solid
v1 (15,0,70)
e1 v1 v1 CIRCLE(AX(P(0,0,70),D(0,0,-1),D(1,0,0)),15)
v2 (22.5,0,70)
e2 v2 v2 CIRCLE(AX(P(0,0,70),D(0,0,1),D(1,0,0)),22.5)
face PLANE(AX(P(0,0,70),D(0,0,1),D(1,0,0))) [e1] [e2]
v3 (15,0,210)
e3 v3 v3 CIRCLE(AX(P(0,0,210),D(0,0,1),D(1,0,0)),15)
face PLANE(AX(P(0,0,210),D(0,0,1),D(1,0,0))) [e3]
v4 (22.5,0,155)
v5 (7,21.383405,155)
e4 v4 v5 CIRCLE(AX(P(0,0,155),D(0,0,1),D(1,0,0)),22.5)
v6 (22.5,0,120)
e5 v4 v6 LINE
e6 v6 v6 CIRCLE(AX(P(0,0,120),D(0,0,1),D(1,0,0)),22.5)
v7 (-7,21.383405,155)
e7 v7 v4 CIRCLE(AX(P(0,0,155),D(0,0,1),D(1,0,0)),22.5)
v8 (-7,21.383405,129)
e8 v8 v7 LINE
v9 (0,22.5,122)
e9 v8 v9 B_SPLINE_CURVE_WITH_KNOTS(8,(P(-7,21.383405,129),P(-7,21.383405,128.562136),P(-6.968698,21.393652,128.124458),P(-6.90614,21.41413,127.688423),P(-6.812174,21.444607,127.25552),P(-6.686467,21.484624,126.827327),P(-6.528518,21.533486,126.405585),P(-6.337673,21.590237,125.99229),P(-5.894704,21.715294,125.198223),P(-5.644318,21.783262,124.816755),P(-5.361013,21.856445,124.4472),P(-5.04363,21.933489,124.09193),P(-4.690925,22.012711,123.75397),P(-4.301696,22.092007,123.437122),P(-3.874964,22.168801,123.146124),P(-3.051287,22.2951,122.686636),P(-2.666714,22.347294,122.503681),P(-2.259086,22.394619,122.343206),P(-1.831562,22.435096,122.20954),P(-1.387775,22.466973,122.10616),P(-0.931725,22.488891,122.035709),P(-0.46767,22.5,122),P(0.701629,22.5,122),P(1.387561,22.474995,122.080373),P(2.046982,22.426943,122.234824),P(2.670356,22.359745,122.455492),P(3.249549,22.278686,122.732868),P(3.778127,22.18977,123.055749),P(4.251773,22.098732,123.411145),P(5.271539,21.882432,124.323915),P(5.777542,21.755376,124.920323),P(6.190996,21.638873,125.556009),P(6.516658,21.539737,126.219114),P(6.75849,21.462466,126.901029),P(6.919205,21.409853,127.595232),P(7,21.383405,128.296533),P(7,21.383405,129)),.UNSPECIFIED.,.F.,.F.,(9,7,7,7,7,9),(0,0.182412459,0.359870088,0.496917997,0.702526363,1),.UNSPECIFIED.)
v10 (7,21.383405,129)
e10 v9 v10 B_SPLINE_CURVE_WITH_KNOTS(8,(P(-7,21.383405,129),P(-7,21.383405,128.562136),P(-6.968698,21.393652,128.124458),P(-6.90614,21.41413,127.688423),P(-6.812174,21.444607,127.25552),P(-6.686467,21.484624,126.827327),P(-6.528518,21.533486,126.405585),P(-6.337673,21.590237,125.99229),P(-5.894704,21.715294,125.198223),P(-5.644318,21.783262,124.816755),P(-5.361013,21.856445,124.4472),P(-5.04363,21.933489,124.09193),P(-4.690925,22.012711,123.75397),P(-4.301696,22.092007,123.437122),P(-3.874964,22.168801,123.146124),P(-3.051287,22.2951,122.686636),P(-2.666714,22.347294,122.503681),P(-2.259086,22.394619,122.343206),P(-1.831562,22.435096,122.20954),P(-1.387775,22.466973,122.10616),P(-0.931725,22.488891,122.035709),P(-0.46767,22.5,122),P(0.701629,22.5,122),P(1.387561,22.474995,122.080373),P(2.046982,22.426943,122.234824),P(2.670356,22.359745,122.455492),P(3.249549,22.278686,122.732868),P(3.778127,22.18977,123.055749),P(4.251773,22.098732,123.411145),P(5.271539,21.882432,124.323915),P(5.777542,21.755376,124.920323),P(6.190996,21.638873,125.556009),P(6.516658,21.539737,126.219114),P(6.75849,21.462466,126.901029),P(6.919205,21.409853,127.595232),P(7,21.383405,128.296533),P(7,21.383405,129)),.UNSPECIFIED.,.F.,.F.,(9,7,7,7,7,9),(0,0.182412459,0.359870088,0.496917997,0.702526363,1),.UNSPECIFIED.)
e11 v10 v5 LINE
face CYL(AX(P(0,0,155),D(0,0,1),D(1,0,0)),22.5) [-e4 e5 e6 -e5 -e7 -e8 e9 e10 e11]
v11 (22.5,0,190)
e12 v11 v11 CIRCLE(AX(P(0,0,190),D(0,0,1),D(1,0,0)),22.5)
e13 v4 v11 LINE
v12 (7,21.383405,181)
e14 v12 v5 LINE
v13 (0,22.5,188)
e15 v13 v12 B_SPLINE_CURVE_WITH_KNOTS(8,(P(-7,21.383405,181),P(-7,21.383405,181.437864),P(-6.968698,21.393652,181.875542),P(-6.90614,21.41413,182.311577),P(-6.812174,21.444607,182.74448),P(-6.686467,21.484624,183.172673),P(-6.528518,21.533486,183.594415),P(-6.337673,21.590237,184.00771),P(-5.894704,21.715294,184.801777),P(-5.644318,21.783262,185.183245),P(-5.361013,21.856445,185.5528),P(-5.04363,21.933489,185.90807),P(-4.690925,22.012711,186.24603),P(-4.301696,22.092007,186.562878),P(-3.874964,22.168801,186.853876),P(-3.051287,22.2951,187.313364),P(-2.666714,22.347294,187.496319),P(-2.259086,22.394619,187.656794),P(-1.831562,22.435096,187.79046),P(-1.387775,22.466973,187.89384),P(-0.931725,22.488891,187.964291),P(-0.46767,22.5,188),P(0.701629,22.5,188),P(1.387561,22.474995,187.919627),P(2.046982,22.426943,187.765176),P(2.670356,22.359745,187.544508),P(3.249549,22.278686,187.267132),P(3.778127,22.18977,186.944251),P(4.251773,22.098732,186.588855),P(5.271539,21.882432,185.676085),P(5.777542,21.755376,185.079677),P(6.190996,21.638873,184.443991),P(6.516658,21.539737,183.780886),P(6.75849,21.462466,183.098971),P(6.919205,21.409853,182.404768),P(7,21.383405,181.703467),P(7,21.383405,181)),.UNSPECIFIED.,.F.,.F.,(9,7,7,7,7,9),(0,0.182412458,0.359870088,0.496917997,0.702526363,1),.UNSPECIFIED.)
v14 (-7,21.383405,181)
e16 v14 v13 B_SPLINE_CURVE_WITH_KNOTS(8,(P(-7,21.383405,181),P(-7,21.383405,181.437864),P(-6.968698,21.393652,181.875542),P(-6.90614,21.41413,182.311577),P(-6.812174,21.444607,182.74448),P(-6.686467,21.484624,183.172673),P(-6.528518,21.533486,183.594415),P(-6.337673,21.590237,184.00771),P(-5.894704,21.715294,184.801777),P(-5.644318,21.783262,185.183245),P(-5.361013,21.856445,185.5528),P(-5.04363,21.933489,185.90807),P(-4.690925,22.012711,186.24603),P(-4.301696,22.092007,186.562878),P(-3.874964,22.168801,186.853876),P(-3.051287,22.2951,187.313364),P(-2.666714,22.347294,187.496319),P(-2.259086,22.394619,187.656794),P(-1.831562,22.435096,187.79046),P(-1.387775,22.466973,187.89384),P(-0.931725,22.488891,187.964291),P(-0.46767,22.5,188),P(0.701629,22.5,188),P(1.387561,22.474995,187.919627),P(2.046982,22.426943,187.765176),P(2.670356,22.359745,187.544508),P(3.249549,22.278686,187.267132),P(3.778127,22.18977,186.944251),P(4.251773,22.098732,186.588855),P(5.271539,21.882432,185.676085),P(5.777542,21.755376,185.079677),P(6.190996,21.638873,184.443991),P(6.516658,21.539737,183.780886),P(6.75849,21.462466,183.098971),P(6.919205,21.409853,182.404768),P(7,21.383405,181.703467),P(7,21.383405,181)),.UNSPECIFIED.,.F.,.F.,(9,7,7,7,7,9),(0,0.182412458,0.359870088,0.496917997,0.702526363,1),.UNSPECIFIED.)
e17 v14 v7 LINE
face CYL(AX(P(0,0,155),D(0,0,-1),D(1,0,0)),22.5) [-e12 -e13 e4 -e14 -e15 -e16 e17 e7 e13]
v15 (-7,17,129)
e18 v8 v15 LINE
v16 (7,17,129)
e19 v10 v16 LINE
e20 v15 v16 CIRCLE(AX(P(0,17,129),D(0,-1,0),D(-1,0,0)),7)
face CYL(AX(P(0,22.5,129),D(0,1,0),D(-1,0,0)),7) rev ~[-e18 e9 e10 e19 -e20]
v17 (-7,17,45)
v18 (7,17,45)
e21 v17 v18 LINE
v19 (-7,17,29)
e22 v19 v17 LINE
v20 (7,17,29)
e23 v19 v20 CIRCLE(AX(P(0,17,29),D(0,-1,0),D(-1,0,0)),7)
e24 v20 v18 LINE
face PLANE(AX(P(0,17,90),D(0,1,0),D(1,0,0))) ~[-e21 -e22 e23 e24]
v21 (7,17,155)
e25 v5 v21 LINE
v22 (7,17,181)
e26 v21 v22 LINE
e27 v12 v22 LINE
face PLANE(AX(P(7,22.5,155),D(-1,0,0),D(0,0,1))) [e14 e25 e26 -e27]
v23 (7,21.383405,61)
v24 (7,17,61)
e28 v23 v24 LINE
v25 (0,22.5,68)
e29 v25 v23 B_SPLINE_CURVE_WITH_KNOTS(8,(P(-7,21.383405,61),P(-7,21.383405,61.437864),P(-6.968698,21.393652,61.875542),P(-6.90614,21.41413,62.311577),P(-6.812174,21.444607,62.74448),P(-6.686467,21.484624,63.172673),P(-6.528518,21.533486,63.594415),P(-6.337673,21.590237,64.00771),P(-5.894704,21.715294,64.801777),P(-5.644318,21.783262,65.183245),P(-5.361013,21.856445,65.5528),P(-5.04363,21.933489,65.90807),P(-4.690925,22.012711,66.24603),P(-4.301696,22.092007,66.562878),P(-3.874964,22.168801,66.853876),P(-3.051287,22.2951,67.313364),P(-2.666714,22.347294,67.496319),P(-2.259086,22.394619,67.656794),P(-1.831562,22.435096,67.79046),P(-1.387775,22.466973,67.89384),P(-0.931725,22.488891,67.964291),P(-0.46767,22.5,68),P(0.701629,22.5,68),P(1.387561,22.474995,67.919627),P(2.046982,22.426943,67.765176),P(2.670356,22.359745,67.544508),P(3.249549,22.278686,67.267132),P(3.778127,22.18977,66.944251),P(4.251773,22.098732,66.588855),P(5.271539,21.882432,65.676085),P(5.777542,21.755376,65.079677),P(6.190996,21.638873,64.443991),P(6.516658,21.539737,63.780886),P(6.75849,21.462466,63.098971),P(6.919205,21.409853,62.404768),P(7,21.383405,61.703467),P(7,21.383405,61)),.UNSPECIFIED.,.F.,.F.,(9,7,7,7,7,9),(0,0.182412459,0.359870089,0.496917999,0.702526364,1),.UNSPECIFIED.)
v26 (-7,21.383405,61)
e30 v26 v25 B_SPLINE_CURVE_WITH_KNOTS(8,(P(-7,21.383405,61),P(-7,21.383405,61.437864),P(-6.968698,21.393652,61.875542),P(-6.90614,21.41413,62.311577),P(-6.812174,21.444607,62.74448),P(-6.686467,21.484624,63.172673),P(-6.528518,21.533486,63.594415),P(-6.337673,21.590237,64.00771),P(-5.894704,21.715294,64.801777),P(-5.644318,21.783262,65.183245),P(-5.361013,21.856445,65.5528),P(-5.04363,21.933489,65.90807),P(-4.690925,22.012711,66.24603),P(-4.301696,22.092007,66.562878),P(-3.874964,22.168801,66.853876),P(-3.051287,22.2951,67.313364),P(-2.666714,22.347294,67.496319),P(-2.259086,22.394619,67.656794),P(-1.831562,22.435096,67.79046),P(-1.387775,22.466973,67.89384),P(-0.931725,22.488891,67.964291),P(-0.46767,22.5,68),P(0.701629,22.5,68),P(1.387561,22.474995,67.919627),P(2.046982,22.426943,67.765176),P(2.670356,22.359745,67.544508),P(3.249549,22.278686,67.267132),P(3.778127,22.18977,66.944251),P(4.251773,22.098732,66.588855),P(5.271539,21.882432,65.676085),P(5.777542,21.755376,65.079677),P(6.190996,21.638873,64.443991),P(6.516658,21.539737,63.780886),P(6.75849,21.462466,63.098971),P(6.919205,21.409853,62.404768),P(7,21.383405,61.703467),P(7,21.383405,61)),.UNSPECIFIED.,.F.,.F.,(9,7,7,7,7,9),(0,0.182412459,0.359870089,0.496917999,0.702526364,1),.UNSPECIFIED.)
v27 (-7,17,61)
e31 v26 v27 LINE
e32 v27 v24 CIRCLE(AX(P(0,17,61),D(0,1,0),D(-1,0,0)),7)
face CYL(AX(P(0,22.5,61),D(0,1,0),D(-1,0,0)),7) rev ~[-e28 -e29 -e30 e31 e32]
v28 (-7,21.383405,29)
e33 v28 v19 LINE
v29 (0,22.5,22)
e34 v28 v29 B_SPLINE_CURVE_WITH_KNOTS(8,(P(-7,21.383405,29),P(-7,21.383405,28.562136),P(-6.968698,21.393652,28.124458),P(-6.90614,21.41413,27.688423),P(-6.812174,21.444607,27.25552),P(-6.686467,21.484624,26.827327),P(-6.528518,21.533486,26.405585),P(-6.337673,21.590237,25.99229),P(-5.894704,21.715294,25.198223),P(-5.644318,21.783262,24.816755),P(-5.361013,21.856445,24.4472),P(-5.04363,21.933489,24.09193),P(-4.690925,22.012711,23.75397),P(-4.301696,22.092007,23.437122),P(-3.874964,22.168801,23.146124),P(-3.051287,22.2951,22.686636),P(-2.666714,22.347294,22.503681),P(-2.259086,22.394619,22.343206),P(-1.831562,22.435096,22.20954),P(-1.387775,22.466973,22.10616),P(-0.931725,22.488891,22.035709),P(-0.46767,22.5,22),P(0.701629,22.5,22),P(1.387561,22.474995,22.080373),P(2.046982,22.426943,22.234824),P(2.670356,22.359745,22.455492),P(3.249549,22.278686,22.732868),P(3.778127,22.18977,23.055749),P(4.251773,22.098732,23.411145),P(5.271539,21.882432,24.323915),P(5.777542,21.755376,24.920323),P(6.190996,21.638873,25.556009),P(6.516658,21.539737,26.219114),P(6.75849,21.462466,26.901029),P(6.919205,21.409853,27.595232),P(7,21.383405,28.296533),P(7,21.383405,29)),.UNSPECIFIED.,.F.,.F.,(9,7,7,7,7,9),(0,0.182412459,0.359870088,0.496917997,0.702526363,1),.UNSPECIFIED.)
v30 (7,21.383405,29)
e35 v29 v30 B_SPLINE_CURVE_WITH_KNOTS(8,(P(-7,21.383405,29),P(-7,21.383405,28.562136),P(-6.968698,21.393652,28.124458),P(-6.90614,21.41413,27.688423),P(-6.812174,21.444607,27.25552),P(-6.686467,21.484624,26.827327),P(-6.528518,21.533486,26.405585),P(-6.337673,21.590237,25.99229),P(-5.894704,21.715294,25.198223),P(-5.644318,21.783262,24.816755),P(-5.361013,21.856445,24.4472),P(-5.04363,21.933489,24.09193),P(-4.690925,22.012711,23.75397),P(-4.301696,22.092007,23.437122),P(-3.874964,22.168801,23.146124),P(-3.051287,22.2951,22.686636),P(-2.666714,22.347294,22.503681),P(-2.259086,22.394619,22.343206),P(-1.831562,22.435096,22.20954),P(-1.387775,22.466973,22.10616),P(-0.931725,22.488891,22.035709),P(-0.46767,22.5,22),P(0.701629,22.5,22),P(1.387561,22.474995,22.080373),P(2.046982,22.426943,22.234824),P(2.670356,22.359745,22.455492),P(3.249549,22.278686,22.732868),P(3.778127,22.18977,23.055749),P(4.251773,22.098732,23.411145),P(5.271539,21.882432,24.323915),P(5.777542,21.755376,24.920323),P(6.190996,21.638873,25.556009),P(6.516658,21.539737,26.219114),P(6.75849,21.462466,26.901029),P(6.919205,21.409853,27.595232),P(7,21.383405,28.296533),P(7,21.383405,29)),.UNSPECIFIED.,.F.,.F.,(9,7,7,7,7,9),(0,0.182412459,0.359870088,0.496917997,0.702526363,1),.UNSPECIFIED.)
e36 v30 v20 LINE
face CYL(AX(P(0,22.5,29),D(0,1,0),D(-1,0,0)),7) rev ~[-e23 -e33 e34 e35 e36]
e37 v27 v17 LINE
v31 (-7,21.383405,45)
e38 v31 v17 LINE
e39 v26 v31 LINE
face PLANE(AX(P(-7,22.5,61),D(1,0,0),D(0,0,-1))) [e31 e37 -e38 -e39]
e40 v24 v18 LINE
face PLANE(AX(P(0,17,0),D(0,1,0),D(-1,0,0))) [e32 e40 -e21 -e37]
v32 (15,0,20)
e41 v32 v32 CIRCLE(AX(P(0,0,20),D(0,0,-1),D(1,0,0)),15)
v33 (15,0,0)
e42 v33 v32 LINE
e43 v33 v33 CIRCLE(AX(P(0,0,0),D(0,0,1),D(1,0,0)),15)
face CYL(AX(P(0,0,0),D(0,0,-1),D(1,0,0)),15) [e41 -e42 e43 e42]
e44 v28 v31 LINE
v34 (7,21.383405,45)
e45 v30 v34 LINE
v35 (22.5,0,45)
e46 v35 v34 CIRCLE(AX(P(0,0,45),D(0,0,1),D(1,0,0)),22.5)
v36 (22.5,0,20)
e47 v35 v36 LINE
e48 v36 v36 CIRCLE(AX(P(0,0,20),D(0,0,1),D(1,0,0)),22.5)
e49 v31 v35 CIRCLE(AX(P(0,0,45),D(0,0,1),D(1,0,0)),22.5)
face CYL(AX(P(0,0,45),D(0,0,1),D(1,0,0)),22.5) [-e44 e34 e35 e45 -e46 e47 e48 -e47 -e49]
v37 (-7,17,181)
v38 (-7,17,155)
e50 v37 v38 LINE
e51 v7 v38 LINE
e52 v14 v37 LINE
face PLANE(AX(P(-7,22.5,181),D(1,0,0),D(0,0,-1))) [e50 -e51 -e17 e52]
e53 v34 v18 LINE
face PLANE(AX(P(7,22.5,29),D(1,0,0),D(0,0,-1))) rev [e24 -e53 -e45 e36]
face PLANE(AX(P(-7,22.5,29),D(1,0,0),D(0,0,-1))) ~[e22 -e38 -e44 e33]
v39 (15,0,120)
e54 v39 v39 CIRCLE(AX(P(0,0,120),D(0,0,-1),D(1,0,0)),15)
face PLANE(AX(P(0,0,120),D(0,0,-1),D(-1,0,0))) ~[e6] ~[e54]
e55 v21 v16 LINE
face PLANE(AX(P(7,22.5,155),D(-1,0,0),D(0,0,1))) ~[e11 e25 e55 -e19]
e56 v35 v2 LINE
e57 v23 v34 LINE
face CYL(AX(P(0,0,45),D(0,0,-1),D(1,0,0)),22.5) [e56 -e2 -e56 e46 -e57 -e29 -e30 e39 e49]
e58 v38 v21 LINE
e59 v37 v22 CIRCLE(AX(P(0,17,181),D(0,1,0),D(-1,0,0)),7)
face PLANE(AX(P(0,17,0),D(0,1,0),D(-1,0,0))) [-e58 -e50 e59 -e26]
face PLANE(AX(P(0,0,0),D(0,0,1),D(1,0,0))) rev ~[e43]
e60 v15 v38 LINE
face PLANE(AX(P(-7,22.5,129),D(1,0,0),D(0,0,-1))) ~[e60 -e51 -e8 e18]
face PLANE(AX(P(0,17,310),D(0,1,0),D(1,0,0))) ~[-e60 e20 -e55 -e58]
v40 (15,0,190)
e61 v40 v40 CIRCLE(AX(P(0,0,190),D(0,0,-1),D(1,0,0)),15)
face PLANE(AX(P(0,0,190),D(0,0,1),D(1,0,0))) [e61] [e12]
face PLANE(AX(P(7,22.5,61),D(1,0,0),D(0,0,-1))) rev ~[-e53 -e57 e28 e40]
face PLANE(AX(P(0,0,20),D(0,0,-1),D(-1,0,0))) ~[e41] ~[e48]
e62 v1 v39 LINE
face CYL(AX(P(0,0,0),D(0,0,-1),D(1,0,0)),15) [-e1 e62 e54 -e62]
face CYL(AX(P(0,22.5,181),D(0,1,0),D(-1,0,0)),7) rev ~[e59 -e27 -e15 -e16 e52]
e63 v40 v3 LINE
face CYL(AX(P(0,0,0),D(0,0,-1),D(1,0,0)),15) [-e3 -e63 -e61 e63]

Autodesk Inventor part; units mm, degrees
sketch "スケッチ1" plane through (0, 0, 0) normal (0, 0, 1) x (1, 0, 0)
  point P0 (0, 0)
ref_plane "作業平面1" through (0, 0, 45) normal (0, 0, 1) x (1, 0, 0)
ref_plane "作業平面2" through (0, 0, 155) normal (0, 0, 1) x (1, 0, 0)
ref_plane "作業平面3" through (0, 0, 210) normal (0, 0, 1) x (1, 0, 0)
sketch "スケッチ2" plane through (0, 0, 45) normal (0, 0, 1) x (1, 0, 0)
  circle A0 centre (0, 0) radius 22.5
  dimension "d3" = 45
extrude "押し出し1" add sketch "スケッチ2" along normal blind 25
sketch "スケッチ3" plane through (0, 0, 155) normal (0, 0, 1) x (1, 0, 0)
  circle A0 centre (0, 0) radius 22.5
  dimension "d6" = 45
extrude "押し出し2" add sketch "スケッチ3" along normal blind 35
ref_plane "作業平面5" through (0, 22.5, 0) normal (0, 1, 0) x (-1, 0, 0)
sketch "スケッチ5" plane through (0, 22.5, 0) normal (0, 1, 0) x (-1, 0, 0)
  line L0 (22.5, 45) -> (-22.5, 45) projected
  line L1 (0, 45) -> (0, 65)
  line L2 (0, 65) -> (0, 61)
  arc A0 (7, 61) -> (-7, 61) centre (0, 61) ccw
  line L3 (7, 61) -> (7, 45)
  line L4 (7, 45) -> (-7, 45)
  line L5 (-7, 61) -> (-7, 45)
  line L6 (7, 45) -> (-7, 45)
  point P0 (0, 0)
  point P1 (-4, 61)
  dimension "d11" = 20
  dimension "d12" = 4
  dimension "d13" = 7
extrude "押し出し3" cut sketch "スケッチ5" against normal blind 5.5
mirror "ミラー1" about plane through (0, 0, 45) normal (0, 0, 1) of "押し出し1", "押し出し3"
sketch "スケッチ6" plane through (0, 22.5, 0) normal (0, 1, 0) x (-1, 0, 0)
  line L0 (22.5, 155) -> (-22.5, 155) projected
  line L1 (0, 155) -> (0, 185)
  line L2 (0, 185) -> (0, 181)
  arc A0 (7, 181) -> (-7, 181) centre (0, 181) ccw
  line L3 (7, 181) -> (7, 155)
  line L4 (-7, 155) -> (-7, 181)
  line L5 (7, 155) -> (-7, 155)
  point P0 (0, 0)
  dimension "d16" = 30
  dimension "d17" = 4
  dimension "d18" = 7
extrude "押し出し4" cut sketch "スケッチ6" against normal blind 5.5
mirror "ミラー2" about plane through (0, 0, 155) normal (0, 0, -1) of "押し出し4", "押し出し2"
sketch "スケッチ7" plane through (0, 0, 0) normal (0, 0, 1) x (1, 0, 0)
  circle A0 centre (0, 0) radius 15
  dimension "d21" = 30
extrude "押し出し5" add sketch "スケッチ7" along normal blind 210
properties part number "shift2"
